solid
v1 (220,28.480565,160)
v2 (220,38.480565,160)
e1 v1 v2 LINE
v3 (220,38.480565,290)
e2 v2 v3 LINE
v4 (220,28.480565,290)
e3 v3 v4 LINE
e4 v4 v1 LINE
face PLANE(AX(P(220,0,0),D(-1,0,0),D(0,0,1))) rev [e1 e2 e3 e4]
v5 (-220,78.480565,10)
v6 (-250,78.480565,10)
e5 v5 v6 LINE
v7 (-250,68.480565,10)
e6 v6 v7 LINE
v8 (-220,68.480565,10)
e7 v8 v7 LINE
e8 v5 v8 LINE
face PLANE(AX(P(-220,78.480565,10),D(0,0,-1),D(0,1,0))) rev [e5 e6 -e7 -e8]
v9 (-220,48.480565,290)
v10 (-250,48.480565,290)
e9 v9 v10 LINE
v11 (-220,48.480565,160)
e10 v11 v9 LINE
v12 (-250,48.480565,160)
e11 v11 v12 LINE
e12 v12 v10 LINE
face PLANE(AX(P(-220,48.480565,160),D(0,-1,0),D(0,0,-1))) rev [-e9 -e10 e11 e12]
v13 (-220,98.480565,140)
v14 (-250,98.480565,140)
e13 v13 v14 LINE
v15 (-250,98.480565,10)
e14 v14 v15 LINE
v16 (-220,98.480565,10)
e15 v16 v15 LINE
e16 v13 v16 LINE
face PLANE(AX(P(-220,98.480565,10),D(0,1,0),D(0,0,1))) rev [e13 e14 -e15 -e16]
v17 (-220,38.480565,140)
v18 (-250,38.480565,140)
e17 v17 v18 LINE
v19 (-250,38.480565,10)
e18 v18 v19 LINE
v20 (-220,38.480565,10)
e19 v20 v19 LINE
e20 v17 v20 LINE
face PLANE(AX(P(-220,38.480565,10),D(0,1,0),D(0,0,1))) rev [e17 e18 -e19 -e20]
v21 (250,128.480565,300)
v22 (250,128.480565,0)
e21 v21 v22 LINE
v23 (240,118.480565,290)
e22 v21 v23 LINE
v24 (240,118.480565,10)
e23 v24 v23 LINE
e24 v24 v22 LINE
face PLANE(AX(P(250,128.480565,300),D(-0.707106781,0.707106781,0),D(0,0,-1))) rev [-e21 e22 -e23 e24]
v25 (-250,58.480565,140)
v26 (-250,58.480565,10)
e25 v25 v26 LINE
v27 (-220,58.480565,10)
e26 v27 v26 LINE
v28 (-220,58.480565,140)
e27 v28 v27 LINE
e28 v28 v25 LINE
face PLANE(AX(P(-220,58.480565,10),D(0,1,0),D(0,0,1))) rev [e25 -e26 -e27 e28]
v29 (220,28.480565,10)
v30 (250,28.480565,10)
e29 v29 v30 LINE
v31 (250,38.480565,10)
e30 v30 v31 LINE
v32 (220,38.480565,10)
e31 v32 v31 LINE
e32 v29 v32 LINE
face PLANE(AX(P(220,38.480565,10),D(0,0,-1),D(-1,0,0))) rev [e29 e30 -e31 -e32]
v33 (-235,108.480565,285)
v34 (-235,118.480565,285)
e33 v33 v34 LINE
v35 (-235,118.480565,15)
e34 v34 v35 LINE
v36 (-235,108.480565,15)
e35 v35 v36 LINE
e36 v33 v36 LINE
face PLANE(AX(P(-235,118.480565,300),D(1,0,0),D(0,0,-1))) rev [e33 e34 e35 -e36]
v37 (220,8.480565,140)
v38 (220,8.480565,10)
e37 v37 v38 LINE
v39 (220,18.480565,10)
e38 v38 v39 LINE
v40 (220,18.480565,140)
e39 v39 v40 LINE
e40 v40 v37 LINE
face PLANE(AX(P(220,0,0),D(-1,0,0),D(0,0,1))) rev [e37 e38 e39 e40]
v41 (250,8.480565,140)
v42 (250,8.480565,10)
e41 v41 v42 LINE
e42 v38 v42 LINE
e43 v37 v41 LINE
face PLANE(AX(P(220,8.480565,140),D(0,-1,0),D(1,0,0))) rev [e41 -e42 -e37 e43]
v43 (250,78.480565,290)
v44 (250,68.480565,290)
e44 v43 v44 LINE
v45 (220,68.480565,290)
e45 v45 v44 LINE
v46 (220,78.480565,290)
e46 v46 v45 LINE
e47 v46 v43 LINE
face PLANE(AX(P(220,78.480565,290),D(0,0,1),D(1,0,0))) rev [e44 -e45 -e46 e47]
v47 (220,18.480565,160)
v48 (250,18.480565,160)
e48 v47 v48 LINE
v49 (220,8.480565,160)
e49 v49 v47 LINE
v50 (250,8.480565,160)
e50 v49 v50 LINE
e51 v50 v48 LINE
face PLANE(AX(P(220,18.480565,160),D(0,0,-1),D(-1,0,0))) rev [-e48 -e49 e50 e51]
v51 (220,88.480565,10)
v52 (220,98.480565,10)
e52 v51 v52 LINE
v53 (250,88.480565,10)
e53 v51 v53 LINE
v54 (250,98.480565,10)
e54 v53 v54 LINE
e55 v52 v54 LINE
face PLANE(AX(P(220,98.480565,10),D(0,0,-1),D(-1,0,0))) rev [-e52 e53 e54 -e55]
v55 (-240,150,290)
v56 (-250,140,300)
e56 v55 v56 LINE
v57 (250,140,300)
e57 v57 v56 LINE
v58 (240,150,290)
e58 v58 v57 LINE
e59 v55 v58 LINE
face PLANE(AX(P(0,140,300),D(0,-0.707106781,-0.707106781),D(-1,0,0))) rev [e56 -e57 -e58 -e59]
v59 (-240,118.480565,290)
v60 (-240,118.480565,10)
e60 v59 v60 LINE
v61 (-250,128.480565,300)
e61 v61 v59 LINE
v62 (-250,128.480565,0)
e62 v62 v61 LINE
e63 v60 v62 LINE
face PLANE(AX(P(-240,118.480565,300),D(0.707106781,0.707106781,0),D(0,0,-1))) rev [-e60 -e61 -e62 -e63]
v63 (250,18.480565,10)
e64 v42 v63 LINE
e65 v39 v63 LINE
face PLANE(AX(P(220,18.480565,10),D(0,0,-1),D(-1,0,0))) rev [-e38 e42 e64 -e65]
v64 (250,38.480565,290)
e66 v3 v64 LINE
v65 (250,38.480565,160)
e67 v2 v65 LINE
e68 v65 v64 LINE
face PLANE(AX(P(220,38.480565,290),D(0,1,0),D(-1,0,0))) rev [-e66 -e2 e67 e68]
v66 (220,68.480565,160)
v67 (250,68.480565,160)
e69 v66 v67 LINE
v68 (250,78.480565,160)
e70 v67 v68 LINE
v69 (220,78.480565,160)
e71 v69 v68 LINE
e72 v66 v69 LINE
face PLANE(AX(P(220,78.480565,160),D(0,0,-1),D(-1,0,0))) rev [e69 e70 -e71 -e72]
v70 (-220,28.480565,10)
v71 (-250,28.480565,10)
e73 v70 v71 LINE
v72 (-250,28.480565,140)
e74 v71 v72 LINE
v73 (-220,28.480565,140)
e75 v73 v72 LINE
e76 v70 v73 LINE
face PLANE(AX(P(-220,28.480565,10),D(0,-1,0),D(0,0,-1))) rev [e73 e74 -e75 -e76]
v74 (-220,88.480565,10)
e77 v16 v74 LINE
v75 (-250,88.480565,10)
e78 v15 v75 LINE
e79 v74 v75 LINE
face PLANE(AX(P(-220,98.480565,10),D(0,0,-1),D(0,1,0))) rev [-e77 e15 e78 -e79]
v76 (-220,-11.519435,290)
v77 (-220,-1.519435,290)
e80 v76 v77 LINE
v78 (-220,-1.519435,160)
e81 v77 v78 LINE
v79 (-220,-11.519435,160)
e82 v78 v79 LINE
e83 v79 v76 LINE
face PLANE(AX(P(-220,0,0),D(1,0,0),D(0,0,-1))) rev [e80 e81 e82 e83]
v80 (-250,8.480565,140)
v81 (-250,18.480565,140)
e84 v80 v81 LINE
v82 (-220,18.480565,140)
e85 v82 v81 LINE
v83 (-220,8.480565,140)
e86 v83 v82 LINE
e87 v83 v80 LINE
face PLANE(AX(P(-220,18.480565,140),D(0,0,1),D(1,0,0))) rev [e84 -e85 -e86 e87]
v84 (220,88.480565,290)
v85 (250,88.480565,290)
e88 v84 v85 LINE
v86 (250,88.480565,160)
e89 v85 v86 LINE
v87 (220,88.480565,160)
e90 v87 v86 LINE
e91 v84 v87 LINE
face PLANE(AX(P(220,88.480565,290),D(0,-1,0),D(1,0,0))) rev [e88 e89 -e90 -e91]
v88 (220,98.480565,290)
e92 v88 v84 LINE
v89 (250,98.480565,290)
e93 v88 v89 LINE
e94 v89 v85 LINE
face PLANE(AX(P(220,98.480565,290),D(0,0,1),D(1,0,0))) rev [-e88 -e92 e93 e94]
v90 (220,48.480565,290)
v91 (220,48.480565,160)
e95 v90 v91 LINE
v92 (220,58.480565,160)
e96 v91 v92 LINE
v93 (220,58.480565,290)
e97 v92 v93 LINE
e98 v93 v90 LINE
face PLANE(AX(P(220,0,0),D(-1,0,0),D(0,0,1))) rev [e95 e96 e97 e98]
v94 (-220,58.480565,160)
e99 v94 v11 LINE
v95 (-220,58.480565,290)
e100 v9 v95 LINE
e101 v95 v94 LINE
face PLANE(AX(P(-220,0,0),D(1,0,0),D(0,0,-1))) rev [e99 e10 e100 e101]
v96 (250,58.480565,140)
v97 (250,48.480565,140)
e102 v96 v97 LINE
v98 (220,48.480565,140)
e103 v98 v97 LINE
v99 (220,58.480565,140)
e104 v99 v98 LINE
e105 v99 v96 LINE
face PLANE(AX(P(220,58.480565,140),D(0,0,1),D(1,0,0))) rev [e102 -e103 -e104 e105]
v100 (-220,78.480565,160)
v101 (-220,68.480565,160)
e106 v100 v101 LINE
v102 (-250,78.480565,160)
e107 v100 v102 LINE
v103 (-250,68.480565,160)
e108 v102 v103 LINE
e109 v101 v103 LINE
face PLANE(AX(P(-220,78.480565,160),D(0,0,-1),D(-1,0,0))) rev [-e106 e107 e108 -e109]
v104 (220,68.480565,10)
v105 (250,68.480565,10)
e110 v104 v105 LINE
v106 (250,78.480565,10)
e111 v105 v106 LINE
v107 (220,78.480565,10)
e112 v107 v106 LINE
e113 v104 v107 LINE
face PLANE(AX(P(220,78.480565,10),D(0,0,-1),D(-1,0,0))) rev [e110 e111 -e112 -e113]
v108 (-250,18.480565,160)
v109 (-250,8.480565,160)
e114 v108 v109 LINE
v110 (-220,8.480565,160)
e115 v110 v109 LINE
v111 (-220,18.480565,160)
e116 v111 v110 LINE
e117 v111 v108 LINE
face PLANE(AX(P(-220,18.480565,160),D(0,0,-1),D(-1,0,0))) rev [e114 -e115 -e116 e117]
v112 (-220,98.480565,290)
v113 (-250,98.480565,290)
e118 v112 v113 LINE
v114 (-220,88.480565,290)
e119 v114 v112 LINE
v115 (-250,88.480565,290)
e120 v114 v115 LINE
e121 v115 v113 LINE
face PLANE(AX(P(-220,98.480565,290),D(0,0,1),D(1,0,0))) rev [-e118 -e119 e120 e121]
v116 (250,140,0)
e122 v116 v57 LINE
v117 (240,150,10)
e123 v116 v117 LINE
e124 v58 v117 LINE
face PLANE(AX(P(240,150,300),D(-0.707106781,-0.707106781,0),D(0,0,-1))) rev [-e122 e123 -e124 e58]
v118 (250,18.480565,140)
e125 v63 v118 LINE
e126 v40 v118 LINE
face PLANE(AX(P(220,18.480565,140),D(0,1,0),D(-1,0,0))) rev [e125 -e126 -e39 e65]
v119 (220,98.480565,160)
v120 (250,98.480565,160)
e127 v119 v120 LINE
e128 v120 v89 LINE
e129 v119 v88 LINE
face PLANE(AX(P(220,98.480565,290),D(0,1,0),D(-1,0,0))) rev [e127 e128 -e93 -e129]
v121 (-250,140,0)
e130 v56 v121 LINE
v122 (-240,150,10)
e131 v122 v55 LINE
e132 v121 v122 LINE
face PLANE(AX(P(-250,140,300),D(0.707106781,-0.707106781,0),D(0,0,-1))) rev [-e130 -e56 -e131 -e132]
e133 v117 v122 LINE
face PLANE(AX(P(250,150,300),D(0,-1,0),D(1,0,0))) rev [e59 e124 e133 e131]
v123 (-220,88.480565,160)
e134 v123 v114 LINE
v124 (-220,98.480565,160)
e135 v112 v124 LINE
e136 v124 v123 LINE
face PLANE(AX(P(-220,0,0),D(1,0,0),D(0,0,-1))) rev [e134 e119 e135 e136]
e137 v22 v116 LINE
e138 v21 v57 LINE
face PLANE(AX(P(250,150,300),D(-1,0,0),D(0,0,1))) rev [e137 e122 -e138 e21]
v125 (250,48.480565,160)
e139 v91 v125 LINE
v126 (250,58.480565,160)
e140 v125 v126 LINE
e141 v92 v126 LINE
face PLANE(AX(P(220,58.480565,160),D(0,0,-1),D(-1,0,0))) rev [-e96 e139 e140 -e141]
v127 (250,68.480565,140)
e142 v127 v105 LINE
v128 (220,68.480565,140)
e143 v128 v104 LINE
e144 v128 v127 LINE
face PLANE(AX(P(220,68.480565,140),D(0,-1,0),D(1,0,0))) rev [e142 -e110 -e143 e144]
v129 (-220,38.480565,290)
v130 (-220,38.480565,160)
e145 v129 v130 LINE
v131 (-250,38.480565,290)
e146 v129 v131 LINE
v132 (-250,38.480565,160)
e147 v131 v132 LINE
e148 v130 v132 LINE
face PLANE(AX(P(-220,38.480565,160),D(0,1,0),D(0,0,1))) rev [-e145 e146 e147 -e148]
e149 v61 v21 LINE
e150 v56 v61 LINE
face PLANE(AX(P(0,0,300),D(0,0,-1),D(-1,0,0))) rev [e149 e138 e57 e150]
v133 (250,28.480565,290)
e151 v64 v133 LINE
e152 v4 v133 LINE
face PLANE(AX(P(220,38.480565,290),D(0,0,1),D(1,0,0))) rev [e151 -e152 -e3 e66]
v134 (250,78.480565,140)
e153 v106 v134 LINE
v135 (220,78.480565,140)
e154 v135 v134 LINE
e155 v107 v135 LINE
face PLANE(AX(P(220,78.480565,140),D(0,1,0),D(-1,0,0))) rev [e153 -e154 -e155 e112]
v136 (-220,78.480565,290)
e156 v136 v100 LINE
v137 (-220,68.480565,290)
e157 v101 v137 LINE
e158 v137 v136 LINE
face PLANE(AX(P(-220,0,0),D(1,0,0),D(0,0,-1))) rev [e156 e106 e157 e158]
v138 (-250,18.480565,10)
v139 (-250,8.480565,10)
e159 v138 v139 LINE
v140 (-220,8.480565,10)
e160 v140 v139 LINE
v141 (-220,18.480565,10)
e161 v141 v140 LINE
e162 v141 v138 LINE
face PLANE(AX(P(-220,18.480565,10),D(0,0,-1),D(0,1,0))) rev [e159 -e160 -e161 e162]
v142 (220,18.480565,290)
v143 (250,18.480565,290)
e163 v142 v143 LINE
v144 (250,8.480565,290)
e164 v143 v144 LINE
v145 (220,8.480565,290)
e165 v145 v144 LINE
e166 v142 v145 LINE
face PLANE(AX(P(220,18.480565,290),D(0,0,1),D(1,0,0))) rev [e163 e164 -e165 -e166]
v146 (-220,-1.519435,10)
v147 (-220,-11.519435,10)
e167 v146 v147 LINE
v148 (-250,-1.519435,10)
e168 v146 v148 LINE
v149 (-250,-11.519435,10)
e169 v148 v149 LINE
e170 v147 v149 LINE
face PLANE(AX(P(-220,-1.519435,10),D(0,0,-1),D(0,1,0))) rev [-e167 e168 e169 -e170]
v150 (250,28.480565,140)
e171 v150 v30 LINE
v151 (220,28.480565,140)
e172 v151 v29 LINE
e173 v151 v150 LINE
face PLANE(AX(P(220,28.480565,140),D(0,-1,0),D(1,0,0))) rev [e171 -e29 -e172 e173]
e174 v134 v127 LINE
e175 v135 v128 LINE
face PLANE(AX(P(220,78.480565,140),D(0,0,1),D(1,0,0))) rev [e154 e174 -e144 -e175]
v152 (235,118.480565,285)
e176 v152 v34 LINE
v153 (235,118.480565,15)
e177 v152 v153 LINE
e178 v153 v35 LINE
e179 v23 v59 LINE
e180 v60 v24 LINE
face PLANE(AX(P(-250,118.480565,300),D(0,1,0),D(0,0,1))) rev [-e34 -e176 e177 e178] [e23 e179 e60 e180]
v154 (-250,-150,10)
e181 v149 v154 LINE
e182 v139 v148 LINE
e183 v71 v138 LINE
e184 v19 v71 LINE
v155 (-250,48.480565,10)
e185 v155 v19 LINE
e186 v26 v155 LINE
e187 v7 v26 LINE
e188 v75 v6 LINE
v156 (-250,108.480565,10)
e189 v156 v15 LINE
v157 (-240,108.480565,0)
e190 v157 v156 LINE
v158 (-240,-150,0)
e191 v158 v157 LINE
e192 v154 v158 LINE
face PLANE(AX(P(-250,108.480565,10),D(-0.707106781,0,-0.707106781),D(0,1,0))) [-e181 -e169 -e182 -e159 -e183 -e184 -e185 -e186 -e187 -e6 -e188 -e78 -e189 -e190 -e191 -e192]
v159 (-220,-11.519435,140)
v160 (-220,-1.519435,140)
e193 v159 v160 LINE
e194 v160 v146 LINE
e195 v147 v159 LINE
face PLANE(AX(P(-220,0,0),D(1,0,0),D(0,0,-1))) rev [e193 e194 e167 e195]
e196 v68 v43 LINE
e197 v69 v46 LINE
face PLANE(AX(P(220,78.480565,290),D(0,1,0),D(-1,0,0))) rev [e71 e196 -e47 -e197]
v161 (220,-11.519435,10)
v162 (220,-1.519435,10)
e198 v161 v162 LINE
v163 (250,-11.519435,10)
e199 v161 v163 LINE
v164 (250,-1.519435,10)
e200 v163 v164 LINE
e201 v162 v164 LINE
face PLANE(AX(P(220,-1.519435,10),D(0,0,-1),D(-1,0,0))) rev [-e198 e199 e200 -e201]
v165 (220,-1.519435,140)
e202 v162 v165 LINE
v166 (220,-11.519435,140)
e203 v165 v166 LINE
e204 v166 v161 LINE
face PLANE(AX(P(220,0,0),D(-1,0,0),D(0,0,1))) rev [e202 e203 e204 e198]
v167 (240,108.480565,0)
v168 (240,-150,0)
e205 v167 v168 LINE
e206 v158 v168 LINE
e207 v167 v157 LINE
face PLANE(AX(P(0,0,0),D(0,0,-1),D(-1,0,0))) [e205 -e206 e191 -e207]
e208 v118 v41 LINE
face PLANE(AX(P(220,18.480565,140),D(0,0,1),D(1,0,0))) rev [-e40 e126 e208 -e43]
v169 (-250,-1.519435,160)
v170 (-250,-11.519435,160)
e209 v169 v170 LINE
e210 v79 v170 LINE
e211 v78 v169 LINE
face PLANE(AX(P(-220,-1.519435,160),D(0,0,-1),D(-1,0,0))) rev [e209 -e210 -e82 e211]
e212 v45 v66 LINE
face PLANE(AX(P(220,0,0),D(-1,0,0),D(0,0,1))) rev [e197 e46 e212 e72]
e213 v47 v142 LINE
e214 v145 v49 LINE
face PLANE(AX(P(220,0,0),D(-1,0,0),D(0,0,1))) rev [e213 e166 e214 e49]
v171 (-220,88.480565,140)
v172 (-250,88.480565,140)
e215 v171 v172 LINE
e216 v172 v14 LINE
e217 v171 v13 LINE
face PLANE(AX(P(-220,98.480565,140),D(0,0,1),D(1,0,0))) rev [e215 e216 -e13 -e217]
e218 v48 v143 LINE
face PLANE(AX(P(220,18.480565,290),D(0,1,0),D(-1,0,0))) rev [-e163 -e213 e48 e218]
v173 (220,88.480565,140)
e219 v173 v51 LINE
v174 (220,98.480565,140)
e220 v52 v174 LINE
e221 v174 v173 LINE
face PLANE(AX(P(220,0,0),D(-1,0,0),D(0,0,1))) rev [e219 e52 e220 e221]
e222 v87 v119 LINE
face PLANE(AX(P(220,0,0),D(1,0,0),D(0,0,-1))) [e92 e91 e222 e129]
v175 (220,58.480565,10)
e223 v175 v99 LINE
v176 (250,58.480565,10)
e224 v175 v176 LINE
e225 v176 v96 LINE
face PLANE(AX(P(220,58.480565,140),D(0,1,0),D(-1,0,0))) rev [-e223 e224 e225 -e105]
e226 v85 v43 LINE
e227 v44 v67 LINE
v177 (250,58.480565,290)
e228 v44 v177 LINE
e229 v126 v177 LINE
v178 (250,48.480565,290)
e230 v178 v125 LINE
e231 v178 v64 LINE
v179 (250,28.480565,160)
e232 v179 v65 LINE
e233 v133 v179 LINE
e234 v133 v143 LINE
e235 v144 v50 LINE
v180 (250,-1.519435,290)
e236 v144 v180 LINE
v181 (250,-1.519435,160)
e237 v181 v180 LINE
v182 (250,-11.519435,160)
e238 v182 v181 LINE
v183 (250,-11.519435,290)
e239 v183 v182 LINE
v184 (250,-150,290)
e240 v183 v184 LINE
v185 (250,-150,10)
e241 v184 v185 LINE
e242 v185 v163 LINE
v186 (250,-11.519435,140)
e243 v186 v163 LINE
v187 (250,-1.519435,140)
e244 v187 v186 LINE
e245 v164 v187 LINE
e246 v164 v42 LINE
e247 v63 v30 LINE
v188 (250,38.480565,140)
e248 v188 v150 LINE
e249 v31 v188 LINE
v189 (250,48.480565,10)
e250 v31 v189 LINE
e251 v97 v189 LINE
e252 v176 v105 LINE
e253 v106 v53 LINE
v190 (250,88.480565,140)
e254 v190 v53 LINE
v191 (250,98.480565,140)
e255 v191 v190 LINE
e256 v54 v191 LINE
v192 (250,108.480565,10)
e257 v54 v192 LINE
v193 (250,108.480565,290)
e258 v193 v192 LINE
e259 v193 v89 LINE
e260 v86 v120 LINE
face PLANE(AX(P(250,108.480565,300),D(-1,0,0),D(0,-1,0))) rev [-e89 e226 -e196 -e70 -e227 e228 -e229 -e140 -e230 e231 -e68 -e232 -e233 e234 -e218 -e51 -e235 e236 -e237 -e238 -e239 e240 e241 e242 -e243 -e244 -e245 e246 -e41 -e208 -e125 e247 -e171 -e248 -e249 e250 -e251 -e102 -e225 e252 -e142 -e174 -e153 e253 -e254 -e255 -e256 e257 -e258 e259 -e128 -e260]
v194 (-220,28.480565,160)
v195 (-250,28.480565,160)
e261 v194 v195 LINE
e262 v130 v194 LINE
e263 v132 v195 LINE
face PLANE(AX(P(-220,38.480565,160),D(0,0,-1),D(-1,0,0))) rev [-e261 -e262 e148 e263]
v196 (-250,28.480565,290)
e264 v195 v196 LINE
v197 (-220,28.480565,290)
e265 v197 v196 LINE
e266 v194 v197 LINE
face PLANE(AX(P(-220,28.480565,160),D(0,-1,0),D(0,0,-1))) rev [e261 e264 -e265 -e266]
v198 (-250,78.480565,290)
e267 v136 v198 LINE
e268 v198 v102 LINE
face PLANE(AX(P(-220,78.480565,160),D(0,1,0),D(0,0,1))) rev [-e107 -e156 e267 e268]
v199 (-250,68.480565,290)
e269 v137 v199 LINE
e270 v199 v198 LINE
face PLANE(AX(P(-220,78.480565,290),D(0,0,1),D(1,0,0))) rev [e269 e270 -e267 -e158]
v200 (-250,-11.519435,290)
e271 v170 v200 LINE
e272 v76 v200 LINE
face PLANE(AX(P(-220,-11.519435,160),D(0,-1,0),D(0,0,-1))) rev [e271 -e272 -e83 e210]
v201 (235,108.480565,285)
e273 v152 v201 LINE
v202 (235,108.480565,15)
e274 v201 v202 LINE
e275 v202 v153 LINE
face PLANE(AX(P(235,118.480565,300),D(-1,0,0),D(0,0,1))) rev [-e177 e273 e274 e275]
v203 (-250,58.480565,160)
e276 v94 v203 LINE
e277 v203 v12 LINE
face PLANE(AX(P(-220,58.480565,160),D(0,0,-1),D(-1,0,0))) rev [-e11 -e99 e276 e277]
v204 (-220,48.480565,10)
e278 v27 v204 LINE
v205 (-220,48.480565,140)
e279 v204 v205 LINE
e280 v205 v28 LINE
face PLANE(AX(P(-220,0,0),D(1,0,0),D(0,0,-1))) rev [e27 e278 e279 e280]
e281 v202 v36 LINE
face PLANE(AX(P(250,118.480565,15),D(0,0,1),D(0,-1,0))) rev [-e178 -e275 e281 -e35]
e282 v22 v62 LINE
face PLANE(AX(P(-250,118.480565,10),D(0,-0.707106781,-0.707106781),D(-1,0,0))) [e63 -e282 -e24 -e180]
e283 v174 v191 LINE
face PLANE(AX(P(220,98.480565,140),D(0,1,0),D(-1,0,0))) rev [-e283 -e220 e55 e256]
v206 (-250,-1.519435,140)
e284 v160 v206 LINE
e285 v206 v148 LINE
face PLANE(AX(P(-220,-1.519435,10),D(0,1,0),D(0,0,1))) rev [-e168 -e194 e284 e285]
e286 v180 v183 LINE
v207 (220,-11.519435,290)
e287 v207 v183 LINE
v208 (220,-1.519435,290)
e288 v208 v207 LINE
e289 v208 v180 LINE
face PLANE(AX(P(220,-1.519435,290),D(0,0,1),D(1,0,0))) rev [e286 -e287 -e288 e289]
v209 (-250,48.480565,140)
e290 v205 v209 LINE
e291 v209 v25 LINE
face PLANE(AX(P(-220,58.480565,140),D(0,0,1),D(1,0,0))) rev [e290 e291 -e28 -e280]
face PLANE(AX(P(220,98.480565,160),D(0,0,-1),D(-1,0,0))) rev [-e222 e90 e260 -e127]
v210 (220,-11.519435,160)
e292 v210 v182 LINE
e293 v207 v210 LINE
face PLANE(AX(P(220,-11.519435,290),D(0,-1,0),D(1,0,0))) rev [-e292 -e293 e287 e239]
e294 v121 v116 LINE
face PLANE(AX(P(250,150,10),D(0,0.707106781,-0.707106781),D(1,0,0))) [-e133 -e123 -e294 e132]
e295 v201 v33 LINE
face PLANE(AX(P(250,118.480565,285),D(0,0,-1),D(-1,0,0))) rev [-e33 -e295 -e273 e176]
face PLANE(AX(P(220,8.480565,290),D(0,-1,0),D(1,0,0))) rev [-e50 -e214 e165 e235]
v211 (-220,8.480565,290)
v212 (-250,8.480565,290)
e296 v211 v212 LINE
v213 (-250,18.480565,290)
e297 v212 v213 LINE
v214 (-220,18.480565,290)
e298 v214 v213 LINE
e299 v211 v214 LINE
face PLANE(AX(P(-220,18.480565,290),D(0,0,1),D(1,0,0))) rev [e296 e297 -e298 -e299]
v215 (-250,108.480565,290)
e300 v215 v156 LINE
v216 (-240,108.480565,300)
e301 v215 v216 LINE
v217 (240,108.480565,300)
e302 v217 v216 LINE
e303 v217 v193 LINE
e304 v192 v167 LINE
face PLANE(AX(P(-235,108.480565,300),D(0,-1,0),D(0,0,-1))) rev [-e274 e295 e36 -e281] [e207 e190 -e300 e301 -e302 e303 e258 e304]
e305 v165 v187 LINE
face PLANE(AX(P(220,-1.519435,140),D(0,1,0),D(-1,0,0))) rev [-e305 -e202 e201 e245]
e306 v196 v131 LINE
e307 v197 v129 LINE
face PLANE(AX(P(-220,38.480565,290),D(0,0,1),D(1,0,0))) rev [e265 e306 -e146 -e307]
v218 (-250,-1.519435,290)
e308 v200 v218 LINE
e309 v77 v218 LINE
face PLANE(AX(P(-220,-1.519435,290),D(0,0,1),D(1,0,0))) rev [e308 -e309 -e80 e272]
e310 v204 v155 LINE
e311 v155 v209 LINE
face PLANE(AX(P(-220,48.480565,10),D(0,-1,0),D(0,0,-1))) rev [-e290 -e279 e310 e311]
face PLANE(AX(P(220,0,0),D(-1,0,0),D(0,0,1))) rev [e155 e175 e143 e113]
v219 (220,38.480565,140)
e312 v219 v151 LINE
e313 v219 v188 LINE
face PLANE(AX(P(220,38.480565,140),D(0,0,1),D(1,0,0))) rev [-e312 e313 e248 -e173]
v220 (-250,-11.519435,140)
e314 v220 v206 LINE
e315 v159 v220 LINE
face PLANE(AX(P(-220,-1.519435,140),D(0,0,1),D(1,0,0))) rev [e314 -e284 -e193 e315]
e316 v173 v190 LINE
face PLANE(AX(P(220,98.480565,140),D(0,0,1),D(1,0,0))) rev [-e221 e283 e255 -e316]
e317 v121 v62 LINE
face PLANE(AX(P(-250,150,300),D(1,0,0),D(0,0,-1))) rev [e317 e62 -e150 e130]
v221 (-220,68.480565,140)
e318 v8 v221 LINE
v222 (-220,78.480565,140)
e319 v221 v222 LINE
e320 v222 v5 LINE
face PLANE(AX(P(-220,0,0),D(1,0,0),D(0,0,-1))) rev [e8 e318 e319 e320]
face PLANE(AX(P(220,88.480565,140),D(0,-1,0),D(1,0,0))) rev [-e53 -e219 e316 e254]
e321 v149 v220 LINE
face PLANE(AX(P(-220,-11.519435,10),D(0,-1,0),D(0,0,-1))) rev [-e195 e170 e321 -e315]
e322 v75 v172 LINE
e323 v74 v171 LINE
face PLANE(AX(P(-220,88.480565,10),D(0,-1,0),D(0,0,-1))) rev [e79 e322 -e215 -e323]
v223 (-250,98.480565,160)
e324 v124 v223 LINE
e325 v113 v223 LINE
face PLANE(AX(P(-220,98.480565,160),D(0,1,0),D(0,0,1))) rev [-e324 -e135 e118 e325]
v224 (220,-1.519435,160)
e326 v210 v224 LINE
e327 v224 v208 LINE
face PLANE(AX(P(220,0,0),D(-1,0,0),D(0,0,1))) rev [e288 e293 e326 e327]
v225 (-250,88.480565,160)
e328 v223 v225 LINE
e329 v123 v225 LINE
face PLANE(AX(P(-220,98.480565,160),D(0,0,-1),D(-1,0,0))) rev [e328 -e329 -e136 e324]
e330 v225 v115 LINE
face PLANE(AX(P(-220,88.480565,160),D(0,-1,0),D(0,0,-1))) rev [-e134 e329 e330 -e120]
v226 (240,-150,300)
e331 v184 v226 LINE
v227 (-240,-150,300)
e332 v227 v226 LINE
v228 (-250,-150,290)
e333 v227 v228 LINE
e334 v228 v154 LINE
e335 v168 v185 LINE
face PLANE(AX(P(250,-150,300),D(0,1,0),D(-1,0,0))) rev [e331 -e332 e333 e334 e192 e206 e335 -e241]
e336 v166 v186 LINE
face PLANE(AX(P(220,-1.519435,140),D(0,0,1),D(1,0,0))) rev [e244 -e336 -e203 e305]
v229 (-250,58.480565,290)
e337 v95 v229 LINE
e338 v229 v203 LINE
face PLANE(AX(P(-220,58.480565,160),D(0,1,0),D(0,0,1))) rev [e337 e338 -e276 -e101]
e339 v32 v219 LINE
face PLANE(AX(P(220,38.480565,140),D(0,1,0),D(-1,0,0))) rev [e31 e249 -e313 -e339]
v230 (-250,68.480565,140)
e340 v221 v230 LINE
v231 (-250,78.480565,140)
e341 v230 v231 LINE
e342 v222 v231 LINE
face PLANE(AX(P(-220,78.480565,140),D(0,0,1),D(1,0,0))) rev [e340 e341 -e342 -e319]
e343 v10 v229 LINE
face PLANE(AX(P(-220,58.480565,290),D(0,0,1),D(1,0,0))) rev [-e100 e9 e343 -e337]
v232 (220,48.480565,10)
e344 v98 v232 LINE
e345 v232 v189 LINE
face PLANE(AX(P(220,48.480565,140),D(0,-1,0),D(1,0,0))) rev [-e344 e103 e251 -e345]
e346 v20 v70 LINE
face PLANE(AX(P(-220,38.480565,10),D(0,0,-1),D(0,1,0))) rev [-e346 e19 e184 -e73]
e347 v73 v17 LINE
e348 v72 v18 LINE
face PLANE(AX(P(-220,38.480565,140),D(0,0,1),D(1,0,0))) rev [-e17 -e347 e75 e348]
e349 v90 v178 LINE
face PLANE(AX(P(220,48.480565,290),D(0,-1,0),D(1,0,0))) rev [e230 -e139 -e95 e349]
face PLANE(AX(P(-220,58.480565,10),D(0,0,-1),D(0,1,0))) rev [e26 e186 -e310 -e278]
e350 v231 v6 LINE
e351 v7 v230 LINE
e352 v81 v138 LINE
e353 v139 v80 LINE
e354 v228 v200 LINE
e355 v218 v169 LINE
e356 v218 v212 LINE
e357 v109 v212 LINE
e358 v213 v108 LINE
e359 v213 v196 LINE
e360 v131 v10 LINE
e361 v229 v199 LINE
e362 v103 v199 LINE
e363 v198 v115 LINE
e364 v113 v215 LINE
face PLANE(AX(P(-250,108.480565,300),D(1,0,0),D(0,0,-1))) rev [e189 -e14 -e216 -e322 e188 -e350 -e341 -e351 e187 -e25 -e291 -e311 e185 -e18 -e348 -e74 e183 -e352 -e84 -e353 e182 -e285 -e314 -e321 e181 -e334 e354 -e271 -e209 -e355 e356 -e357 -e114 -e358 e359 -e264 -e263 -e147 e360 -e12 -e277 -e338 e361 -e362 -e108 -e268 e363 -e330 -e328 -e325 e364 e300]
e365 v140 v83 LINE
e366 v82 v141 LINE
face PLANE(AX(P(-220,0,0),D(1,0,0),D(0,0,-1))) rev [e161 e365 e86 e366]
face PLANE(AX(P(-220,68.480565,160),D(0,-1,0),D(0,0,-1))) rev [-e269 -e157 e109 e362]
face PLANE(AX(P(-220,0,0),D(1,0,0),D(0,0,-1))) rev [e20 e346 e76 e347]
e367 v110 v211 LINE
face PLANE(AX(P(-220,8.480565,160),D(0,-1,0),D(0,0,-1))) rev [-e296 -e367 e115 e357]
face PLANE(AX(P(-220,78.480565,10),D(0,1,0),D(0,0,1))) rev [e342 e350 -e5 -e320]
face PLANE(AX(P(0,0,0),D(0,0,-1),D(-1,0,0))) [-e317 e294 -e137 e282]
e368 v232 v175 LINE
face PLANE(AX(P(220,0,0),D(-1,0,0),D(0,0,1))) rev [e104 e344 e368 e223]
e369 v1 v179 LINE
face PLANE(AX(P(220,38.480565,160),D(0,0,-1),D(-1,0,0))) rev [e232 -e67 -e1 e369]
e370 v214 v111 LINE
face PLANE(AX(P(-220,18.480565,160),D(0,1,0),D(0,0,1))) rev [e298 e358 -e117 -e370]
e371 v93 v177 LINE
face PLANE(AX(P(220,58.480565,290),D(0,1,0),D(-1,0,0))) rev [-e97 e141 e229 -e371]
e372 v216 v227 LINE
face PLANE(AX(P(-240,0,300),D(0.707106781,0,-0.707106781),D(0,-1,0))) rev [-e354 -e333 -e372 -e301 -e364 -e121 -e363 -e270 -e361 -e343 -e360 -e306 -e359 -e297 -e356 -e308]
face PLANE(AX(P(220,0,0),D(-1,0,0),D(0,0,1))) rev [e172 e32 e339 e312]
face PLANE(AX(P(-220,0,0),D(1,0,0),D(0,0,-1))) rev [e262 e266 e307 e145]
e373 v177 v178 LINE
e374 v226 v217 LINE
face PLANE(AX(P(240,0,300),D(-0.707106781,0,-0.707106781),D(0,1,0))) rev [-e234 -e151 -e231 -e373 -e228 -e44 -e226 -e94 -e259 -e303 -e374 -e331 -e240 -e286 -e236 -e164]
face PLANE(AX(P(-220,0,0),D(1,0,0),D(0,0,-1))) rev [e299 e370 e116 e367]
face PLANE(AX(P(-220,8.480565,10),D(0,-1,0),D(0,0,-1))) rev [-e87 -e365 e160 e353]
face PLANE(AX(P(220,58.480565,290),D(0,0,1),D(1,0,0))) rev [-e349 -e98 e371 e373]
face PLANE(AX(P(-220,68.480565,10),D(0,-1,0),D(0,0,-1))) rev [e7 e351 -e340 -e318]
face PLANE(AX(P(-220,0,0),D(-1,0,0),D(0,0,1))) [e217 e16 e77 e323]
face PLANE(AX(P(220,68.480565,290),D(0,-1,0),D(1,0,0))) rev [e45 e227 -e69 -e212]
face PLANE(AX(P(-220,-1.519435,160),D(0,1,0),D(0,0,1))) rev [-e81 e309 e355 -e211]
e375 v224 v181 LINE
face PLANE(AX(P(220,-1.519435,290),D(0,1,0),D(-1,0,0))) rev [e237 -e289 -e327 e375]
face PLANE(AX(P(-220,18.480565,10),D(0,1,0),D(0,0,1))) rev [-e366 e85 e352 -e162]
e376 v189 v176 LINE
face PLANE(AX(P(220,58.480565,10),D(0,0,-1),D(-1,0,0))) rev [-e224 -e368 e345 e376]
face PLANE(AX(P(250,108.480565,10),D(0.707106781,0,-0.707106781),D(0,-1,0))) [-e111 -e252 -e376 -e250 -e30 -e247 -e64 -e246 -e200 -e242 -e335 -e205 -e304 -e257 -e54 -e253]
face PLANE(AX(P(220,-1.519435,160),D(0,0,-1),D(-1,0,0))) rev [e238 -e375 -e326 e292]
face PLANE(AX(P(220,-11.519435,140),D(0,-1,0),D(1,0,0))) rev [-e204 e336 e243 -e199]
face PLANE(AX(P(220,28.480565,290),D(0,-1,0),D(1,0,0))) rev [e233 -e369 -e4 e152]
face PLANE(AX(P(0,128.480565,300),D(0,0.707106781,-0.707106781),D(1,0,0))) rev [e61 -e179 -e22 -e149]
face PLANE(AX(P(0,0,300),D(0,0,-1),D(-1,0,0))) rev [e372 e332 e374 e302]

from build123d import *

# Parameters (mm, degrees)
BOSS_EXTRUDE1_DEPTH = 300
SKETCH2_W           = 15
SKETCH2_H           = 10
CUT_EXTRUDE1_DEPTH  = 603.07972894
SKETCH4_W           = 130
SKETCH4_H           = 10
CUT_EXTRUDE2_DEPTH  = 30
SKETCH7_W           = 130
SKETCH7_H           = 10
CUT_EXTRUDE3_DEPTH  = 30
CHAMFER1_SIZE       = 10
CHAMFER2_SIZE       = 10
CHAMFER3_SIZE       = 10


with BuildPart() as part:
    # Sketch1 → Boss-Extrude1 (new body)
    with BuildSketch(Plane.XY):
        Polygon((250, 118.480565371), (235, 118.480565371), (235, 108.480565371), (250, 108.480565371), (250, -150), (-250, -150), (-250, 108.480565371), (-235, 108.480565371), (-235, 118.480565371), (-250, 118.480565371), (-250, 150), (250, 150), align=None)
    extrude(amount=BOSS_EXTRUDE1_DEPTH)

    # Sketch2 → Cut-Extrude1 (cut, through all)
    with BuildSketch(Plane.ZY.offset(250)):
        with Locations((292.5, 113.480565371)):
            Rectangle(SKETCH2_W, SKETCH2_H)
        with Locations((7.5, 113.480565371)):
            Rectangle(SKETCH2_W, SKETCH2_H)
    extrude(amount=-CUT_EXTRUDE1_DEPTH, mode=Mode.SUBTRACT)

    # Sketch4 → Cut-Extrude2 (cut)
    with BuildSketch(Plane.ZY.offset(250)):
        with Locations((75, 93.480565371)):
            Rectangle(SKETCH4_W, SKETCH4_H)
        with Locations((225, 93.480565371)):
            Rectangle(SKETCH4_W, SKETCH4_H)
        with Locations((225, 73.480565371)):
            Rectangle(SKETCH4_W, SKETCH4_H)
        with Locations((225, 53.480565371)):
            Rectangle(SKETCH4_W, SKETCH4_H)
        with Locations((225, 33.480565371)):
            Rectangle(SKETCH4_W, SKETCH4_H)
        with Locations((225, 13.480565371)):
            Rectangle(SKETCH4_W, SKETCH4_H)
        with Locations((225, -6.519434629)):
            Rectangle(SKETCH4_W, SKETCH4_H)
        with Locations((75, 73.480565371)):
            Rectangle(SKETCH4_W, SKETCH4_H)
        with Locations((75, 53.480565371)):
            Rectangle(SKETCH4_W, SKETCH4_H)
        with Locations((75, 33.480565371)):
            Rectangle(SKETCH4_W, SKETCH4_H)
        with Locations((75, 13.480565371)):
            Rectangle(SKETCH4_W, SKETCH4_H)
        with Locations((75, -6.519434629)):
            Rectangle(SKETCH4_W, SKETCH4_H)
    extrude(amount=-CUT_EXTRUDE2_DEPTH, mode=Mode.SUBTRACT)

    # Sketch7 → Cut-Extrude3 (cut)
    with BuildSketch(Plane(origin=(250, 0, 0), x_dir=(0, 0, -1), z_dir=(1, 0, 0))):
        with Locations((-225, 93.480565371)):
            Rectangle(SKETCH7_W, SKETCH7_H)
        with Locations((-75, 93.480565371)):
            Rectangle(SKETCH7_W, SKETCH7_H)
        with Locations((-75, 73.480565371)):
            Rectangle(SKETCH7_W, SKETCH7_H)
        with Locations((-75, 53.480565371)):
            Rectangle(SKETCH7_W, SKETCH7_H)
        with Locations((-75, 33.480565371)):
            Rectangle(SKETCH7_W, SKETCH7_H)
        with Locations((-75, 13.480565371)):
            Rectangle(SKETCH7_W, SKETCH7_H)
        with Locations((-75, -6.519434629)):
            Rectangle(SKETCH7_W, SKETCH7_H)
        with Locations((-225, 73.480565371)):
            Rectangle(SKETCH7_W, SKETCH7_H)
        with Locations((-225, 53.480565371)):
            Rectangle(SKETCH7_W, SKETCH7_H)
        with Locations((-225, 33.480565371)):
            Rectangle(SKETCH7_W, SKETCH7_H)
        with Locations((-225, 13.480565371)):
            Rectangle(SKETCH7_W, SKETCH7_H)
        with Locations((-225, -6.519434629)):
            Rectangle(SKETCH7_W, SKETCH7_H)
    extrude(amount=-CUT_EXTRUDE3_DEPTH, mode=Mode.SUBTRACT)

    # Chamfer1
    chamfer1_edges = [part.edges().sort_by_distance(p)[0] for p in [
        (0, 150, 0),
        (-250, 150, 150),
        (250, 150, 150),
        (0, 150, 300),
    ]]
    chamfer(chamfer1_edges, length=CHAMFER1_SIZE)

    # Chamfer2
    chamfer2_edges = [part.edges().sort_by_distance(p)[0] for p in [
        (0, 118.480565371, 0),
        (-250, 118.480565371, 150),
        (250, 118.480565371, 150),
        (0, 118.480565371, 300),
    ]]
    chamfer(chamfer2_edges, length=CHAMFER2_SIZE)

    # Chamfer3
    chamfer3_edges = [part.edges().sort_by_distance(p)[0] for p in [
        (250, -20.759717314, 300),
        (250, -20.759717314, 0),
        (-250, -20.759717314, 0),
        (-250, -20.759717314, 300),
    ]]
    chamfer(chamfer3_edges, length=CHAMFER3_SIZE - 0.0001)  # a hair under: the kernel refuses the full size


solid = part.part
